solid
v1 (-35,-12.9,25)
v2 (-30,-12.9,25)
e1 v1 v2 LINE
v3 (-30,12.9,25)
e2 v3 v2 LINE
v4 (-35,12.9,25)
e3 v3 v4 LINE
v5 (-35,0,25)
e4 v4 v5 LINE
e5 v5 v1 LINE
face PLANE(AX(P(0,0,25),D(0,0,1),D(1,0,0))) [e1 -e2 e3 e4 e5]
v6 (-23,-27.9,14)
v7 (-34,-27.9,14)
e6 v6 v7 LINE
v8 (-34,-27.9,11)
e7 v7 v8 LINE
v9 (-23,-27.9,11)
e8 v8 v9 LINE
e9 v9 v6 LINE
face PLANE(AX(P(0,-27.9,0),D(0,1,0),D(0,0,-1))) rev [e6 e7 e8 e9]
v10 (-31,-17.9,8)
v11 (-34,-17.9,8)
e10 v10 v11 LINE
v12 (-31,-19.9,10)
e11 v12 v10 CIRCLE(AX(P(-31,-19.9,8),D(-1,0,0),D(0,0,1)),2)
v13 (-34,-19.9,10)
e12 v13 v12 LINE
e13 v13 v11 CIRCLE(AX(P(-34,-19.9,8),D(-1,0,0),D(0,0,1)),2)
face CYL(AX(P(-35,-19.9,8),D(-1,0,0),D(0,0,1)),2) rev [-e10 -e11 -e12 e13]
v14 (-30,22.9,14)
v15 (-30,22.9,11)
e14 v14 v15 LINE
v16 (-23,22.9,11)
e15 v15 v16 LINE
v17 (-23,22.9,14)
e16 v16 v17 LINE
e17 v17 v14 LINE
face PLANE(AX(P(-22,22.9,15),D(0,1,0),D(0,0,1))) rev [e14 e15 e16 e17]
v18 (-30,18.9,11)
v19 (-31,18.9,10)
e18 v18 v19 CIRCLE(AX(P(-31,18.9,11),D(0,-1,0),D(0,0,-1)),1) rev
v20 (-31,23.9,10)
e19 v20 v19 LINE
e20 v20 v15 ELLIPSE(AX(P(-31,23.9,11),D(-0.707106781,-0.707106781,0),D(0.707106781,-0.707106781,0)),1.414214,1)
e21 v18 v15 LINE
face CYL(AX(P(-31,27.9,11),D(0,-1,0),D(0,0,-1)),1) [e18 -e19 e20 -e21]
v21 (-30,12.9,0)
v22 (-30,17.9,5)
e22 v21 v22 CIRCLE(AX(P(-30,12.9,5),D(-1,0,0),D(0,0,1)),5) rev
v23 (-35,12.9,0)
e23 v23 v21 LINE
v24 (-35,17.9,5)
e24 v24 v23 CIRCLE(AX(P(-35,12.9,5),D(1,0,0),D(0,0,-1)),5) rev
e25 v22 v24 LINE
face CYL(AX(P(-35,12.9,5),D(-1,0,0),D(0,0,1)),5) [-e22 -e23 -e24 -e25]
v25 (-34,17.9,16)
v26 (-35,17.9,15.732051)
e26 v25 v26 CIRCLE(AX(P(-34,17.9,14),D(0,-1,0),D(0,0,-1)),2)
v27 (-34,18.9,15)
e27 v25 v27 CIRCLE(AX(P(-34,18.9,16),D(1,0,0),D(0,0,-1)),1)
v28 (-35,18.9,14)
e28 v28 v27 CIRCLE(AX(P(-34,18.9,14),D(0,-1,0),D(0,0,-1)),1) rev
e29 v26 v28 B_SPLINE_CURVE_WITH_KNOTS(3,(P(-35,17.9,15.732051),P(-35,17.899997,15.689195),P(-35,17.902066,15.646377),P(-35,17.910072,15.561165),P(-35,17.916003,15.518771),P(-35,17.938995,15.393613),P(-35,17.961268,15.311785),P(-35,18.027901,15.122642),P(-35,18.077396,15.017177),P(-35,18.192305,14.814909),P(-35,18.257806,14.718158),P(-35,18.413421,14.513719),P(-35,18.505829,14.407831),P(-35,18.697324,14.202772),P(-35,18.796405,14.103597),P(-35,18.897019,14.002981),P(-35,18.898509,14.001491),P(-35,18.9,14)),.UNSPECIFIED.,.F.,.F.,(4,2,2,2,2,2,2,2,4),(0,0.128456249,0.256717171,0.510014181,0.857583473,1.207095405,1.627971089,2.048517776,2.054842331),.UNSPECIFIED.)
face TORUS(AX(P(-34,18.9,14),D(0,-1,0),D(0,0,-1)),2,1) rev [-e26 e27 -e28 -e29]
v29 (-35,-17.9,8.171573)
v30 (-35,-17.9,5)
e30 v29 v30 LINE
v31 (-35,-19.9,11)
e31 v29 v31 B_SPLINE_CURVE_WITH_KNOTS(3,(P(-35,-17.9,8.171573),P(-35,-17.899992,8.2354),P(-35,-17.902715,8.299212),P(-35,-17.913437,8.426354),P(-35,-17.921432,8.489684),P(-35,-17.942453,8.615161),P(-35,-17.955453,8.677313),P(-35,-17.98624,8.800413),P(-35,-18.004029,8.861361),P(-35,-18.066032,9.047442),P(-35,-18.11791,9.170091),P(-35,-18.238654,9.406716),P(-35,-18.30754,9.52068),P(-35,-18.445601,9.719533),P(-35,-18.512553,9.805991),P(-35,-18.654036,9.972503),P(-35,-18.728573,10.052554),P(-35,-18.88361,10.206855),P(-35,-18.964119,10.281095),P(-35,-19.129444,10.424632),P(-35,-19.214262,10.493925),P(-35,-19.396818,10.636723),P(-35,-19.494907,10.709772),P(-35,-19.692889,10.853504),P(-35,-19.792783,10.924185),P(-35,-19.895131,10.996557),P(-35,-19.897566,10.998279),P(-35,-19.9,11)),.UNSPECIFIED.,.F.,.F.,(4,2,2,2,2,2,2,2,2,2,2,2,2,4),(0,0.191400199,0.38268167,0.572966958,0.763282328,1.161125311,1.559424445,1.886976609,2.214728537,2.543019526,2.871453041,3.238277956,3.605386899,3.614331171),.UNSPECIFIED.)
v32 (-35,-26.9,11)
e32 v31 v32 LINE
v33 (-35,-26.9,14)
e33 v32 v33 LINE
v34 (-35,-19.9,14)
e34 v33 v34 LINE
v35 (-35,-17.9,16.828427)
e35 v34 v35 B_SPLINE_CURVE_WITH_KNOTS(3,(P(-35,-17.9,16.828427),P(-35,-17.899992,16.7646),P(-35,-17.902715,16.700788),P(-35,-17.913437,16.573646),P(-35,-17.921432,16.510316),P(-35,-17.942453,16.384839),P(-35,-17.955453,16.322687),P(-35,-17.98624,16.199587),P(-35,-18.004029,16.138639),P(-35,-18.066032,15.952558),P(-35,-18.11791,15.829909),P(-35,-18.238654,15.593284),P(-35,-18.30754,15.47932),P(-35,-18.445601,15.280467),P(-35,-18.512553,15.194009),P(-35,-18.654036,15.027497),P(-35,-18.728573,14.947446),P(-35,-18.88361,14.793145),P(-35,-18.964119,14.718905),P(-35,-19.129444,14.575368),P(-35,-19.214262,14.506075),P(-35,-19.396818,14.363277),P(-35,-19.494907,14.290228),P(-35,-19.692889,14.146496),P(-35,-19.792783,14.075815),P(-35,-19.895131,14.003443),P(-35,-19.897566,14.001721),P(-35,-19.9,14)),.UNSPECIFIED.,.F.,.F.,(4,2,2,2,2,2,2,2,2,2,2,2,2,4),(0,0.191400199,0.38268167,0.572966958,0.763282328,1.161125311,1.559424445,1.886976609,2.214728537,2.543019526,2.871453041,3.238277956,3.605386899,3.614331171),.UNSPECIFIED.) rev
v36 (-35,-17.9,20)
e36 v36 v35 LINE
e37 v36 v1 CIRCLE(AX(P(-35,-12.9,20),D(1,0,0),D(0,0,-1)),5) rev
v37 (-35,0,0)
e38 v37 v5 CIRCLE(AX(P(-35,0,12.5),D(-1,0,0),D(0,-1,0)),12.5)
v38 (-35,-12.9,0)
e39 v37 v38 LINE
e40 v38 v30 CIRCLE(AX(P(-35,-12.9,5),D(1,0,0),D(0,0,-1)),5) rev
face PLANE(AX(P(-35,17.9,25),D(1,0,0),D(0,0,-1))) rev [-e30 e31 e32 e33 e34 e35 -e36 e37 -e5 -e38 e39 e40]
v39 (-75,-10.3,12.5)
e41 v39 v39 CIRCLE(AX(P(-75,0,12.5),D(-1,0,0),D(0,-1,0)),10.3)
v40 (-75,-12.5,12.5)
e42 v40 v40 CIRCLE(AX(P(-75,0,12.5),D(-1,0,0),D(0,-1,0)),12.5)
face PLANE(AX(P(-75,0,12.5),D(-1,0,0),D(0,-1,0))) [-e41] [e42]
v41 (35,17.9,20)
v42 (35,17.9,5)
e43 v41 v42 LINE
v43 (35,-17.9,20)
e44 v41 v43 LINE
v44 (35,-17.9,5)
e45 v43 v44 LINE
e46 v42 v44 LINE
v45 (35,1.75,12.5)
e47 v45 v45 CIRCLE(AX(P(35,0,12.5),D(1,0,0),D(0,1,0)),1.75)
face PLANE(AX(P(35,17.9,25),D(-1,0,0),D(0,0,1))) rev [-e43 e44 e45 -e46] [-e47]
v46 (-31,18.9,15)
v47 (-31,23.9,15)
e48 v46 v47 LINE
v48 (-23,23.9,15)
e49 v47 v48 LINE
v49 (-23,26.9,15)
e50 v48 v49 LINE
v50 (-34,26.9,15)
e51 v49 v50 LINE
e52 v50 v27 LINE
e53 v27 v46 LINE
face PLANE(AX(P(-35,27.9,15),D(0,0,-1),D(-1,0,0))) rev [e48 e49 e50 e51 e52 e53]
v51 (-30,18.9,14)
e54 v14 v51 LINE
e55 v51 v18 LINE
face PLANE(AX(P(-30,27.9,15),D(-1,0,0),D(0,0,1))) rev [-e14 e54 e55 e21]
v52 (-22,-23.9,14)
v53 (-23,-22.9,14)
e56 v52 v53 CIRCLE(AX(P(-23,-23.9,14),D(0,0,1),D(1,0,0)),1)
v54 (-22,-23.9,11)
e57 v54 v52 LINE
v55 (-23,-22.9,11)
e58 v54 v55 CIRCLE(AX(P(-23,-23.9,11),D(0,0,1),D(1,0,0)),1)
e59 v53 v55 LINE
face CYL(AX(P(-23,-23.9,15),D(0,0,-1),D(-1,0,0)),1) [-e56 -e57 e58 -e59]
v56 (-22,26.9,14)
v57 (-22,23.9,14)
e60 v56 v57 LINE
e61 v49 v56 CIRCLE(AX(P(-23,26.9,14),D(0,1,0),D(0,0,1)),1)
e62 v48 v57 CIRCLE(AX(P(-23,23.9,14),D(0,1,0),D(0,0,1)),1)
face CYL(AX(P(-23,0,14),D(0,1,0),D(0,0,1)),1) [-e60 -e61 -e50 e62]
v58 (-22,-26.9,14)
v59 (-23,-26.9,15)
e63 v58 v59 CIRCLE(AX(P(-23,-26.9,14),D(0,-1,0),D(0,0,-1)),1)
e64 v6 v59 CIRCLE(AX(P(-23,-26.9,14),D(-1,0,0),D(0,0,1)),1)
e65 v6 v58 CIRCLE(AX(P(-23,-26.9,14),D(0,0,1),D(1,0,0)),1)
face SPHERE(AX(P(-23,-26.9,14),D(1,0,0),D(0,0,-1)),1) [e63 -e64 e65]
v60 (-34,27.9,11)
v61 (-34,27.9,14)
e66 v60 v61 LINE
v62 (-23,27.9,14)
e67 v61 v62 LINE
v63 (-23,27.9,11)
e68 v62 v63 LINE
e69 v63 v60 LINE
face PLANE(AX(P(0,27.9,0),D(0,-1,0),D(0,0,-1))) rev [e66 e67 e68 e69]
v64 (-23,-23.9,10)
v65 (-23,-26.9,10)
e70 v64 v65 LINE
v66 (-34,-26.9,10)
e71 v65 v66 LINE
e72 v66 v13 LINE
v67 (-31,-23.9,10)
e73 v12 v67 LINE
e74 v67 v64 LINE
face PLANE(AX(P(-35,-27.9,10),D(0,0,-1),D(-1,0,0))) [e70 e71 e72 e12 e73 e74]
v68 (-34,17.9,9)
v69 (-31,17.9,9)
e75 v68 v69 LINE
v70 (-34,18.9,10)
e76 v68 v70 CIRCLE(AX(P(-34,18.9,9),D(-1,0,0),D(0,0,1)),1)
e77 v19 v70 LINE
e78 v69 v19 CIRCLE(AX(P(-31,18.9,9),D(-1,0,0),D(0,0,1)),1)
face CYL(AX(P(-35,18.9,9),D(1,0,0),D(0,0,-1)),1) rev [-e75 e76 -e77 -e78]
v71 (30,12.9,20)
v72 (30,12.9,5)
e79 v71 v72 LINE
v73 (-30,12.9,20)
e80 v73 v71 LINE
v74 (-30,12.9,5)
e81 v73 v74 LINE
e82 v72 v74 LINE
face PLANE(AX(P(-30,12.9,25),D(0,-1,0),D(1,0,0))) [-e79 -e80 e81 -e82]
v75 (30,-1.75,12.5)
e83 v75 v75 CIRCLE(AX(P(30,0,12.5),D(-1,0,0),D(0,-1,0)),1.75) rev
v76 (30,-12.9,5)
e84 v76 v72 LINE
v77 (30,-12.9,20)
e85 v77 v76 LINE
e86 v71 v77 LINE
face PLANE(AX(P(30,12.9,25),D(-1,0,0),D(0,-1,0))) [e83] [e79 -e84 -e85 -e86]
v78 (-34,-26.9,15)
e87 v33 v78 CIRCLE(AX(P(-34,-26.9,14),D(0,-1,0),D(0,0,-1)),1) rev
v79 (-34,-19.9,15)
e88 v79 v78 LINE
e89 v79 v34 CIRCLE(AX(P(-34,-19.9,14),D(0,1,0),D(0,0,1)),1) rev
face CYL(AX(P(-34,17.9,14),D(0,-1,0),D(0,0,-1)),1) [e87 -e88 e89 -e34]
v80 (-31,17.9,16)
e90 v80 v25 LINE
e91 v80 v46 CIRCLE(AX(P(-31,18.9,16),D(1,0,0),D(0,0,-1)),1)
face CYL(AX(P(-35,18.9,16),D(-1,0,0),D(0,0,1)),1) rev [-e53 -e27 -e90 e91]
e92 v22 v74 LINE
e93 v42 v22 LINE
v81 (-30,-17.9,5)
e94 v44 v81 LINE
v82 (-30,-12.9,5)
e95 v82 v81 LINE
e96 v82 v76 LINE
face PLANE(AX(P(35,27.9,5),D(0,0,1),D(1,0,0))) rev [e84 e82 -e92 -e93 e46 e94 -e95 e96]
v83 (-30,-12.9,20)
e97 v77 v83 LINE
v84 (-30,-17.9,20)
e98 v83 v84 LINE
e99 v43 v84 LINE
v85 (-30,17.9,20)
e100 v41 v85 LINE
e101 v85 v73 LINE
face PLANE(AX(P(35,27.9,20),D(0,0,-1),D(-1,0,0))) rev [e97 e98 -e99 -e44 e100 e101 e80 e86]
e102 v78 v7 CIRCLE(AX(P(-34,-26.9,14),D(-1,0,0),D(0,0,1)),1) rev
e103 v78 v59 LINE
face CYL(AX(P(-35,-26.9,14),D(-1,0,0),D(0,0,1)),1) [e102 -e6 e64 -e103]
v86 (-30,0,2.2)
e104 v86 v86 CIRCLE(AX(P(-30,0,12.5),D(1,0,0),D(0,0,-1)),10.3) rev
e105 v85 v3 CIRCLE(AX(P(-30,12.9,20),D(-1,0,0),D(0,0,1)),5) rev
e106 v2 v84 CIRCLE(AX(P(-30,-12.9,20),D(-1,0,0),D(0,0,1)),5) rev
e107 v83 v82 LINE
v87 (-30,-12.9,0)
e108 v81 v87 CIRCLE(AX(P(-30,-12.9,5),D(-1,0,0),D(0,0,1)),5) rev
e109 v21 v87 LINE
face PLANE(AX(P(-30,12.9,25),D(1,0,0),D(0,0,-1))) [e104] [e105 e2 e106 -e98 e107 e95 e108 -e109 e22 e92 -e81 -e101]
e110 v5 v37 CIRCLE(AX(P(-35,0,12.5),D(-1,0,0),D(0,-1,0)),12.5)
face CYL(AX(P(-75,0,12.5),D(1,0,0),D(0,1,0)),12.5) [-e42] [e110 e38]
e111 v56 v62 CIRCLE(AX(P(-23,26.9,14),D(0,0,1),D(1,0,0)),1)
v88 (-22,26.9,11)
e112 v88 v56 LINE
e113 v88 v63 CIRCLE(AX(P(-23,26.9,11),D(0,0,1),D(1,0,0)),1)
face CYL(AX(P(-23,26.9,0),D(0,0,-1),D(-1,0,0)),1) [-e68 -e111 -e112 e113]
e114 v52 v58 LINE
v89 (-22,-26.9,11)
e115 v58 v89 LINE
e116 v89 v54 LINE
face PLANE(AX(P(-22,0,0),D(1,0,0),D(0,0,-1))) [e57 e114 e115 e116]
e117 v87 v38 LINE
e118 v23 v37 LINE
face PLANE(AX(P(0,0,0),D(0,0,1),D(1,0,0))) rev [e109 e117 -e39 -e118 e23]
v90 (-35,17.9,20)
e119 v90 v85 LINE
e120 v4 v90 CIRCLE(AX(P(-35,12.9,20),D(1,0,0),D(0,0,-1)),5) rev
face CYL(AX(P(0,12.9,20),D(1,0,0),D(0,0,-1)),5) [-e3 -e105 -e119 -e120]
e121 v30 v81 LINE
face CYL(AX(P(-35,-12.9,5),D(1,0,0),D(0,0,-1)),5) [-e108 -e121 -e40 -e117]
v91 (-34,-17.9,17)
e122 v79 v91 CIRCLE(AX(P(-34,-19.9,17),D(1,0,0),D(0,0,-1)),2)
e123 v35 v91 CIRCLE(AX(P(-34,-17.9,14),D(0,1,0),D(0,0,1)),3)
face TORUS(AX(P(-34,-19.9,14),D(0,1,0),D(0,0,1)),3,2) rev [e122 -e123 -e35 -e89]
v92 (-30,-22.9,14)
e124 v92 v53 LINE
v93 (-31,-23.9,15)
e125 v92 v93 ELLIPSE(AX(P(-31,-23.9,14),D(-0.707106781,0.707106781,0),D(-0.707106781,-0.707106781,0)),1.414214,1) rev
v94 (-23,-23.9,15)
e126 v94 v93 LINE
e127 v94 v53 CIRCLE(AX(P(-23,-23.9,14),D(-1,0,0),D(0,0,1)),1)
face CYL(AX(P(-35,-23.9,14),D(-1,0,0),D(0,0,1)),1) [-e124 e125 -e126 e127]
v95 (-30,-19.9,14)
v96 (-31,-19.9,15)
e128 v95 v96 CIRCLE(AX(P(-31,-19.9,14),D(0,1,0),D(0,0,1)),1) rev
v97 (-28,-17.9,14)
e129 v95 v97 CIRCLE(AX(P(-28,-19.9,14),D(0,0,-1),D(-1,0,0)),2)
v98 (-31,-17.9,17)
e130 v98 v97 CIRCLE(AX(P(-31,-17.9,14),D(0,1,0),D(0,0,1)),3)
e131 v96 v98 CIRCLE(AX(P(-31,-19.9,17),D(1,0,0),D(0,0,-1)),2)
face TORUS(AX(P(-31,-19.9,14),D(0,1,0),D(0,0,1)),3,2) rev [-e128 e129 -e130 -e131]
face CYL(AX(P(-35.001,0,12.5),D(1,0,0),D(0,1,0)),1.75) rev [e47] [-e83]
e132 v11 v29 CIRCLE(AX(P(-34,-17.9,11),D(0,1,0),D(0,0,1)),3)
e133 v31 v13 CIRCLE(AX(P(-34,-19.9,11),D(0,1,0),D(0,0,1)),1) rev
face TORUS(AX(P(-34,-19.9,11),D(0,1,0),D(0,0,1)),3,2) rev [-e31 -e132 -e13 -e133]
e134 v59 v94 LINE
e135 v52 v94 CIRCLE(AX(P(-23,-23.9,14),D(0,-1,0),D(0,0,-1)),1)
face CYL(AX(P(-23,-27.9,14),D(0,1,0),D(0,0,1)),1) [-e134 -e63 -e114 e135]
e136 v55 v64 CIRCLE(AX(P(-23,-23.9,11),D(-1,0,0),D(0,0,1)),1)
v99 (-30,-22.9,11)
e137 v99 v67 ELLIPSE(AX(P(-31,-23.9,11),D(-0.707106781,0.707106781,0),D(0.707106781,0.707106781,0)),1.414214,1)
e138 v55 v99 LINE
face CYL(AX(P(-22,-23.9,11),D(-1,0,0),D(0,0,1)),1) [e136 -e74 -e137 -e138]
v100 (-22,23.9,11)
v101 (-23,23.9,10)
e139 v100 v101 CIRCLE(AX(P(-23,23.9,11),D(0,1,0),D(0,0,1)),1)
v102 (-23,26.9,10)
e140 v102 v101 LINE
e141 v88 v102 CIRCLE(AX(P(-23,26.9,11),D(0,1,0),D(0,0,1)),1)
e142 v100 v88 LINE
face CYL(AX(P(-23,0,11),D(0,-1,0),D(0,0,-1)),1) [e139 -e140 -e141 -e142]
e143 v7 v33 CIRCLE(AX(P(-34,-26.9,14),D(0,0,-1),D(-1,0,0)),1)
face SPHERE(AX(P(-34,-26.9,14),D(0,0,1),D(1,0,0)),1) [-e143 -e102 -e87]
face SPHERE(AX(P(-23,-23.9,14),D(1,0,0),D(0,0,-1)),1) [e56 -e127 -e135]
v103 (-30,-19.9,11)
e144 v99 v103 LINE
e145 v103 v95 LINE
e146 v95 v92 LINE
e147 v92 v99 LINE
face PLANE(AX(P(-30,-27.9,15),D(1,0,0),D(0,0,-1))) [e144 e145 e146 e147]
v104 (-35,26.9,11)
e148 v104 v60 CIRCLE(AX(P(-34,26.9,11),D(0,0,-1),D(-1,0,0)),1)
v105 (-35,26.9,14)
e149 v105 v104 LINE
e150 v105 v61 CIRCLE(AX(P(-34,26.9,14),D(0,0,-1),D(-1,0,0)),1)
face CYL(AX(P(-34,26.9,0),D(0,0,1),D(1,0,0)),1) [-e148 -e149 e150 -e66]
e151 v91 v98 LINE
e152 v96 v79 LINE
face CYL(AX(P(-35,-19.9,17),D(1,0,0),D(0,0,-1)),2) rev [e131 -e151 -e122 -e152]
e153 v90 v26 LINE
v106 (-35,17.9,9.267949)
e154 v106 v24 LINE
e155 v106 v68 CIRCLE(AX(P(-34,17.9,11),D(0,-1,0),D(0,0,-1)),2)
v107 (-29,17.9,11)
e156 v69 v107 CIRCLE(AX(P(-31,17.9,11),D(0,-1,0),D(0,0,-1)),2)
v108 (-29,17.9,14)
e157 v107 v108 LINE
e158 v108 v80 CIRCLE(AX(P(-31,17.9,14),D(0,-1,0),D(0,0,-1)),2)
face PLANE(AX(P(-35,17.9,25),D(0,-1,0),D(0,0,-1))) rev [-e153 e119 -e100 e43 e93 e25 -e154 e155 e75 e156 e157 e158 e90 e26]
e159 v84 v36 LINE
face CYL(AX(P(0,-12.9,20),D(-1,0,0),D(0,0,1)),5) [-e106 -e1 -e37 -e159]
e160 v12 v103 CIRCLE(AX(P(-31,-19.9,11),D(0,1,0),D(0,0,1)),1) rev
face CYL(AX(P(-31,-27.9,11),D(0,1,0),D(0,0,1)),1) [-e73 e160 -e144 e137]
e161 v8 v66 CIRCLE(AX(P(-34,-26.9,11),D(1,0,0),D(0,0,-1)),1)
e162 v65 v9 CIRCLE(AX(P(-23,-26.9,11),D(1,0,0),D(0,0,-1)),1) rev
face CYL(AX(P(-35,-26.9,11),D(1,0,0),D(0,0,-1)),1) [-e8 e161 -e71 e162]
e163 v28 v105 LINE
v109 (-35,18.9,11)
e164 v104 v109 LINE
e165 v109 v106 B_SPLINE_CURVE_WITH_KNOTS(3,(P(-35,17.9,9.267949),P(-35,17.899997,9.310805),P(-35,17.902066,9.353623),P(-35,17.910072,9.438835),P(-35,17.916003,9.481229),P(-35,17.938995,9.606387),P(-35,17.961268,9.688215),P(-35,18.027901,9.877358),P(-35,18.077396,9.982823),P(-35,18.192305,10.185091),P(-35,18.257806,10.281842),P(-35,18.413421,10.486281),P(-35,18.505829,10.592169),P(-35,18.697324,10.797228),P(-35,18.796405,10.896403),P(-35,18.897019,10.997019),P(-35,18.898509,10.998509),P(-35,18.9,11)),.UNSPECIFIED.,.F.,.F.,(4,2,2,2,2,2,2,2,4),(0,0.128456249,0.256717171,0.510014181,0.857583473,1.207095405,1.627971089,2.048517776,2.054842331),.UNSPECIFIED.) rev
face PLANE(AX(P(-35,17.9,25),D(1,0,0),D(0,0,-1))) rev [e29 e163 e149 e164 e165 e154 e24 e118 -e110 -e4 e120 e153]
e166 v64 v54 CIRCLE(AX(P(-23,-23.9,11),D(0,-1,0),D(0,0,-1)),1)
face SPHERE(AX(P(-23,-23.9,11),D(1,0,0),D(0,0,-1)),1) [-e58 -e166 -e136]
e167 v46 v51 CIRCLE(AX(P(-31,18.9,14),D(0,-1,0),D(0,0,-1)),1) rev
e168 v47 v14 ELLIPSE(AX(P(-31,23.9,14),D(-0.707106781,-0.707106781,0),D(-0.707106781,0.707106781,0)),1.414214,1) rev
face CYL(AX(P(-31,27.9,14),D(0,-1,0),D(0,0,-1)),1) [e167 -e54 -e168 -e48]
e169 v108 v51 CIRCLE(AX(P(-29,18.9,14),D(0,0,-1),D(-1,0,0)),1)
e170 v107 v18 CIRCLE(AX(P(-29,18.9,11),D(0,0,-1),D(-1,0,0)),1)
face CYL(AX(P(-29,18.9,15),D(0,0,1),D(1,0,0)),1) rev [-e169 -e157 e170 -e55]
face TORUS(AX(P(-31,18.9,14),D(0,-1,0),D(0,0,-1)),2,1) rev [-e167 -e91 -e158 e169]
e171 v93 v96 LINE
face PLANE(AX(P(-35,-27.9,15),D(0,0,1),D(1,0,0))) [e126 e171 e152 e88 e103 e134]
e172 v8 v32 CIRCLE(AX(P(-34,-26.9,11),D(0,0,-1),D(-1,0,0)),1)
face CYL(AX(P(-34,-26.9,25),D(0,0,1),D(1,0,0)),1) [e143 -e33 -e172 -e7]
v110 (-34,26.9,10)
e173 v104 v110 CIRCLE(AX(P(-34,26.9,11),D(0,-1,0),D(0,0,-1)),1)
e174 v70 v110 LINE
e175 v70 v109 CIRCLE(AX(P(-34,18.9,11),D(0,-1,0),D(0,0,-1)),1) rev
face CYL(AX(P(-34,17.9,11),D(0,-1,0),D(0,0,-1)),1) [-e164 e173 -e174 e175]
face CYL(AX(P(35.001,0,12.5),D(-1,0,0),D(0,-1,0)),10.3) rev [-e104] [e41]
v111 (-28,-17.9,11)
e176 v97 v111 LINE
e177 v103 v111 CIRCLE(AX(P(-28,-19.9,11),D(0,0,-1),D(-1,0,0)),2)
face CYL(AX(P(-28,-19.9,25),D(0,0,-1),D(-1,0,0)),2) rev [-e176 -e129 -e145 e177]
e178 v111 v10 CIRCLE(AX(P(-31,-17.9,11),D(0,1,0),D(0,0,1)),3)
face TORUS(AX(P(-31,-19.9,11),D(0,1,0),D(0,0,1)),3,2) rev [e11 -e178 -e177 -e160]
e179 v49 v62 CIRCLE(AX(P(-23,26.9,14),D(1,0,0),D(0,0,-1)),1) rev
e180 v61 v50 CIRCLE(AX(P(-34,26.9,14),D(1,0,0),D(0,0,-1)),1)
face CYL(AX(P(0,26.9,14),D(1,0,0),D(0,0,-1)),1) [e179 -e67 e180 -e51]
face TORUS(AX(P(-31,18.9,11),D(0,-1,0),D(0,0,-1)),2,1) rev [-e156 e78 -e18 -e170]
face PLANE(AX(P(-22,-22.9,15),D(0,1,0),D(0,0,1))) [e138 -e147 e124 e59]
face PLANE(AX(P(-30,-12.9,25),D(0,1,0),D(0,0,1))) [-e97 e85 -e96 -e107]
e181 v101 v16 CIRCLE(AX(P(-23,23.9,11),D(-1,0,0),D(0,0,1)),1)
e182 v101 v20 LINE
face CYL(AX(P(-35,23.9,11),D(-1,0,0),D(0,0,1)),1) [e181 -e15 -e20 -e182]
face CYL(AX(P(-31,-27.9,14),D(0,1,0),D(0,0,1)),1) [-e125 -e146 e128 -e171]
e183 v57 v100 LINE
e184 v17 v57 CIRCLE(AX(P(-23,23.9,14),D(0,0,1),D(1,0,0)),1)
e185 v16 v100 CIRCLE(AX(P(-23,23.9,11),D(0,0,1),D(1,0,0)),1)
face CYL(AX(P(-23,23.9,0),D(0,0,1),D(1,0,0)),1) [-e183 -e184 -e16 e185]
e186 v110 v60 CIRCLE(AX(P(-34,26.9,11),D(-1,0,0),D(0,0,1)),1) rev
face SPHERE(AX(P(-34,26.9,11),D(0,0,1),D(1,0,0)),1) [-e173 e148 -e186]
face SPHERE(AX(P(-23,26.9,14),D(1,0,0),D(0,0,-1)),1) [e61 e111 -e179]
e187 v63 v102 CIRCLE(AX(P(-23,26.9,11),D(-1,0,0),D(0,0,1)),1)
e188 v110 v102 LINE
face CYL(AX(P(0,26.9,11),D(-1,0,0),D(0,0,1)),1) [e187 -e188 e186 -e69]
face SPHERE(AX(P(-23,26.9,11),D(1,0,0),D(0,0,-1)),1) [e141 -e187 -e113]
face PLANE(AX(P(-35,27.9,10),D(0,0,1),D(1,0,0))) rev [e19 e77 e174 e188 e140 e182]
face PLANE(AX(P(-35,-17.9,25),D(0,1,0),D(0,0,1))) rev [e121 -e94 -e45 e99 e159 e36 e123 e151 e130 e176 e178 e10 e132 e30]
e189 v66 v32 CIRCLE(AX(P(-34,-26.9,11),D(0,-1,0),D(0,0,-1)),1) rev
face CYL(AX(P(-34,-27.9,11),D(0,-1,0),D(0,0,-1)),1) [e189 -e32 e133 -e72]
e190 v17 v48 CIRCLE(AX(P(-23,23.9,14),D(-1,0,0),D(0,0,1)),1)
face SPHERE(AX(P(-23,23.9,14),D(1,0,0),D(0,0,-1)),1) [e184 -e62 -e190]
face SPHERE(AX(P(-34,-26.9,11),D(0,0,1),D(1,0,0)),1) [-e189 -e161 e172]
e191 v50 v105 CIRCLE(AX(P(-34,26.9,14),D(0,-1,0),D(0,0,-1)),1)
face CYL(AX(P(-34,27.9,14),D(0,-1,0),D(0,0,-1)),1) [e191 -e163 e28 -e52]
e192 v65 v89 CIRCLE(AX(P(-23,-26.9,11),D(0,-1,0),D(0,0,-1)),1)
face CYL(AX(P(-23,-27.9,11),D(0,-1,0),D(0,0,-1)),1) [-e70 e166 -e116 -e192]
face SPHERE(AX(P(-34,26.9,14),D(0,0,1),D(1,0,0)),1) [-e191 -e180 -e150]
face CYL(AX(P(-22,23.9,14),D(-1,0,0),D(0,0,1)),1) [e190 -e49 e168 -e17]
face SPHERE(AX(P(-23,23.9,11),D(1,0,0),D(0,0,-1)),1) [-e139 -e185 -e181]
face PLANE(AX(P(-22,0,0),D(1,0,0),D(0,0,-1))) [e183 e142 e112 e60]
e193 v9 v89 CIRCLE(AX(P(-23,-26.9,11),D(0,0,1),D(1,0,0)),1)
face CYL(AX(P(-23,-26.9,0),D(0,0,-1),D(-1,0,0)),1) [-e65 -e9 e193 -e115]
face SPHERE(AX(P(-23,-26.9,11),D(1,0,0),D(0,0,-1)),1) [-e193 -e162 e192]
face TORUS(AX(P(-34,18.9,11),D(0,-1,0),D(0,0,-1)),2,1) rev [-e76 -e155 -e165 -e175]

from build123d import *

# Parameters (mm, degrees)
SKETCH1_W            = 70
SKETCH1_H            = 35.8
SKETCH1_W_2          = 60
SKETCH1_H_2          = 25.8
BOSS_EXTRUDE1_DEPTH  = 25
CUT_EXTRUDE4_REACH   = 78.455
SKETCH2_R            = 10.3
CUT_EXTRUDE5_REACH   = 78.455
SKETCH3_R            = 1.75
BOSS_EXTRUDE2_START  = 40
SKETCH4_R            = 12.5
SKETCH4_R_2          = 10.3
BOSS_EXTRUDE2_DEPTH  = 40
SKETCH8_W            = 5
SKETCH8_H            = 5
BOSS_EXTRUDE4_DEPTH  = 10
SKETCH11_W           = 5
SKETCH11_H           = 5
BOSS_EXTRUDE5_DEPTH  = 8
FILLET3_R            = 1
FILLET3_OF_MIRROR2_R = 1
FILLET5_START        = -35
FILLET5_DEPTH        = 71
FILLET6_R            = 1
FILLET7_R            = 1
FILLET8_R            = 1
FILLET9_R            = 1
FILLET10_R           = 2
SKETCH16_W           = 65
SKETCH16_H           = 5
CUT_EXTRUDE8_DEPTH   = 92.365420182


with BuildPart() as part:
    # Sketch1 → Boss-Extrude1 (new body)
    with BuildSketch(Plane.XY):
        Rectangle(SKETCH1_W, SKETCH1_H)
        Rectangle(SKETCH1_W_2, SKETCH1_H_2, mode=Mode.SUBTRACT)
    extrude(amount=BOSS_EXTRUDE1_DEPTH)

    # Sketch2 → Cut-Extrude4 (cut, up to next)
    with BuildSketch(Plane.ZY.offset(35), mode=Mode.PRIVATE) as cut_extrude4_sk1:
        with Locations(Location((12.5, 0, 0), (0, 0, 270))):
            Circle(SKETCH2_R)
    cut_extrude4_tool1 = extrude(cut_extrude4_sk1.sketch, amount=-CUT_EXTRUDE4_REACH, mode=Mode.PRIVATE) & part.part
    add(cut_extrude4_tool1.solids().sort_by_distance((-35, 0, 12.5))[0], mode=Mode.SUBTRACT)

    # Sketch3 → Cut-Extrude5 (cut, up to next)
    with BuildSketch(Plane(origin=(35, 0, 0), x_dir=(0, 0, -1), z_dir=(1, 0, 0)), mode=Mode.PRIVATE) as cut_extrude5_sk1:
        with Locations(Location((-12.5, 0, 0), (0, 0, 90))):
            Circle(SKETCH3_R)
    cut_extrude5_tool1 = extrude(cut_extrude5_sk1.sketch, amount=-CUT_EXTRUDE5_REACH, mode=Mode.PRIVATE) & part.part
    add(cut_extrude5_tool1.solids().sort_by_distance((35, 0, 12.5))[0], mode=Mode.SUBTRACT)

    # Sketch4 → Boss-Extrude2 (add)
    with BuildSketch(Plane.ZY.offset(35).offset(BOSS_EXTRUDE2_START)):
        with Locations(Location((12.5, 0, 0), (0, 0, 180))):
            Circle(SKETCH4_R)
        with Locations(Location((12.5, 0, 0), (0, 0, 270))):
            Circle(SKETCH4_R_2, mode=Mode.SUBTRACT)
    extrude(amount=-BOSS_EXTRUDE2_DEPTH)

    # Sketch8 → Boss-Extrude4 (add)
    with BuildSketch(Plane(origin=(0, 17.9, 0), x_dir=(1, 0, 0), z_dir=(0, 1, 0))):
        with Locations((-32.5, -12.5)):
            Rectangle(SKETCH8_W, SKETCH8_H)
    boss_extrude4 = extrude(amount=BOSS_EXTRUDE4_DEPTH)

    # Sketch11 → Boss-Extrude5 (add)
    with BuildSketch(Plane(origin=(-30, 0, 0), x_dir=(0, 0, -1), z_dir=(1, 0, 0))):
        with Locations((-12.5, 25.4)):
            Rectangle(SKETCH11_W, SKETCH11_H)
    boss_extrude5 = extrude(amount=BOSS_EXTRUDE5_DEPTH)

    # Fillet3
    fillet3_edges = [part.edges().sort_by_distance(p)[0] for p in [
        (-35, 22.9, 10),
        (-35, 22.9, 15),
        (-28.5, 27.9, 15),
        (-28.5, 27.9, 10),
        (-30, 20.4, 10),
        (-30, 20.4, 15),
        (-26, 22.9, 15),
        (-26, 22.9, 10),
    ]]
    fillet(fillet3_edges, radius=FILLET3_R)

    # Mirror2: Boss-Extrude4, Boss-Extrude5 across plane
    add(boss_extrude4.mirror(Plane.ZX))
    add(boss_extrude5.mirror(Plane.ZX))

    # Fillet3 of Mirror2
    fillet3_of_mirror2_edges = [part.edges().sort_by_distance(p)[0] for p in [
        (-35, -22.9, 10),
        (-35, -22.9, 15),
        (-28.5, -27.9, 15),
        (-28.5, -27.9, 10),
        (-30, -20.4, 10),
        (-30, -20.4, 15),
        (-26, -22.9, 15),
        (-26, -22.9, 10),
    ]]
    fillet(fillet3_of_mirror2_edges, radius=FILLET3_OF_MIRROR2_R)

    # Fillet5: read off the stored shape, not the designer's step
    # Fillet5 outline → Fillet5 (cut)
    with BuildSketch(Plane.YZ.offset(FILLET5_START)):
        with BuildLine():
            ThreePointArc((12.9, 25), (16.435533906, 23.535533906), (17.9, 20))
            Line((17.9, 20), (17.9, 25))
            Line((17.9, 25), (12.9, 25))
        make_face()
        with BuildLine():
            Line((17.9, 0), (17.9, 5))
            ThreePointArc((17.9, 5), (16.435533906, 1.464466094), (12.9, 0))
            Line((12.9, 0), (17.9, 0))
        make_face()
        with BuildLine():
            ThreePointArc((-17.9, 20), (-16.435533906, 23.535533906), (-12.9, 25))
            Line((-12.9, 25), (-17.9, 25))
            Line((-17.9, 25), (-17.9, 20))
        make_face()
        with BuildLine():
            Line((-17.9, 0), (-12.9, 0))
            ThreePointArc((-12.9, 0), (-16.435533906, 1.464466094), (-17.9, 5))
            Line((-17.9, 5), (-17.9, 0))
        make_face()
    extrude(amount=FILLET5_DEPTH, mode=Mode.SUBTRACT)

    # Fillet6
    fillet6_edges = [part.edges().sort_by_distance(p)[0] for p in [
        (-22, -25.4, 10),
        (-22, -22.9, 12.5),
        (-22, -25.4, 15),
        (-22, -27.9, 12.5),
        (-22, -23.192893219, 14.707106781),
        (-22, -27.607106781, 14.707106781),
        (-22, -27.607106781, 10.292893219),
        (-22, -23.192893219, 10.292893219),
    ]]
    fillet(fillet6_edges, radius=FILLET6_R)

    # Fillet7
    fillet7_edges = [part.edges().sort_by_distance(p)[0] for p in [
        (-22, 25.4, 10),
        (-22, 22.9, 12.5),
        (-22, 25.4, 15),
        (-22, 27.9, 12.5),
        (-22, 23.192893219, 14.707106781),
        (-22, 27.607106781, 14.707106781),
        (-22, 27.607106781, 10.292893219),
        (-22, 23.192893219, 10.292893219),
    ]]
    fillet(fillet7_edges, radius=FILLET7_R)

    # Fillet8
    # the kernel refuses this fillet: 1 mm, written as the material it takes off along each edge
    with BuildSketch(Plane(origin=(-34, 26.9, 11), x_dir=(-1, 0, 0), z_dir=(0, 1, 0))) as fillet8_piece_1_section:
        Polygon((0, 0), (FILLET8_R, 0), (FILLET8_R, -FILLET8_R), (0, -FILLET8_R), align=None)
    fillet8_piece_1 = extrude(amount=FILLET8_R, mode=Mode.PRIVATE)
    fillet8_piece_1 = fillet8_piece_1 - Plane(origin=(-34, 26.9, 11), x_dir=(0.7071067811865475, 0, 0.7071067811865475), z_dir=(0, 1, 0)) * Sphere(FILLET8_R, mode=Mode.PRIVATE)
    add(fillet8_piece_1, mode=Mode.SUBTRACT)
    with BuildSketch(Plane(origin=(-34, 26.9, 14), x_dir=(-1, 0, 0), z_dir=(0, 1, 0))) as fillet8_piece_2_section:
        Polygon((0, 0), (FILLET8_R, 0), (FILLET8_R, FILLET8_R), (0, FILLET8_R), align=None)
    fillet8_piece_2 = extrude(amount=FILLET8_R, mode=Mode.PRIVATE)
    fillet8_piece_2 = fillet8_piece_2 - Plane(origin=(-34, 26.9, 14), x_dir=(0.7071067811865475, 0, -0.7071067811865475), z_dir=(0, 1, 0)) * Sphere(FILLET8_R, mode=Mode.PRIVATE)
    add(fillet8_piece_2, mode=Mode.SUBTRACT)
    with BuildSketch(Plane(origin=(-34, -26.9, 11), x_dir=(0, -1, 0), z_dir=(-1, 0, 0))) as fillet8_piece_3_section:
        Polygon((0, 0), (FILLET8_R, 0), (FILLET8_R, -FILLET8_R), (0, -FILLET8_R), align=None)
    fillet8_piece_3 = extrude(amount=FILLET8_R, mode=Mode.PRIVATE)
    fillet8_piece_3 = fillet8_piece_3 - Plane(origin=(-34, -26.9, 11), x_dir=(0, 0.7071067811865475, 0.7071067811865475), z_dir=(-1, 0, 0)) * Sphere(FILLET8_R, mode=Mode.PRIVATE)
    add(fillet8_piece_3, mode=Mode.SUBTRACT)
    with BuildSketch(Plane(origin=(-34, -26.9, 14), x_dir=(0, -1, 0), z_dir=(-1, 0, 0))) as fillet8_piece_4_section:
        Polygon((0, 0), (FILLET8_R, 0), (FILLET8_R, FILLET8_R), (0, FILLET8_R), align=None)
    fillet8_piece_4 = extrude(amount=FILLET8_R, mode=Mode.PRIVATE)
    fillet8_piece_4 = fillet8_piece_4 - Plane(origin=(-34, -26.9, 14), x_dir=(0, 0.7071067811865475, -0.7071067811865475), z_dir=(-1, 0, 0)) * Sphere(FILLET8_R, mode=Mode.PRIVATE)
    add(fillet8_piece_4, mode=Mode.SUBTRACT)
    with BuildSketch(Plane(origin=(-35, -27.9, 11), x_dir=(0, 1, 0), z_dir=(0, 0, 1)), Plane(origin=(-35, 27.9, 11), x_dir=(1, 0, 0), z_dir=(0, 0, 1))) as fillet8_piece_5:
        with BuildLine():
            CenterArc((FILLET8_R, -FILLET8_R), FILLET8_R, 90, 90)
            Line((0, -FILLET8_R), (0, 0))
            Line((0, 0), (FILLET8_R, 0))
        make_face()
    extrude(amount=3, mode=Mode.SUBTRACT)

    # Fillet9
    # the kernel refuses this fillet: 1 mm, written as the material it adds along each edge
    with BuildSketch(Plane(origin=(-31, 17.9, 10), x_dir=(0, 1, 0), z_dir=(-1, 0, 0)), Plane(origin=(-34, 17.9, 15), x_dir=(0, 1, 0), z_dir=(1, 0, 0))) as fillet9_piece_1:
        with BuildLine():
            CenterArc((FILLET9_R, FILLET9_R), FILLET9_R, 180, 90)
            Line((0, FILLET9_R), (0, 0))
            Line((0, 0), (FILLET9_R, 0))
        make_face()
    extrude(amount=3)
    with BuildSketch(Plane(origin=(-30, 17.9, 14), x_dir=(1, 0, 0), z_dir=(0, 0, -1))) as fillet9_piece_2:
        with BuildLine():
            CenterArc((FILLET9_R, -FILLET9_R), FILLET9_R, 90, 90)
            Line((0, -FILLET9_R), (0, 0))
            Line((0, 0), (FILLET9_R, 0))
        make_face()
    extrude(amount=3)
    with BuildSketch(Plane(origin=(-34, 17.9, 11), x_dir=(0, 0, -1), z_dir=(1, 0, 0))) as fillet9_piece_3_section:
        with BuildLine():
            CenterArc((1 + FILLET9_R, FILLET9_R), FILLET9_R, 180, 90)
            Line((1, FILLET9_R), (1, 0))
            Line((1, 0), (1 + FILLET9_R, 0))
        make_face()
    fillet9_piece_3 = revolve(axis=Axis((-34, 17.9, 11), (0, 1, 0)), revolution_arc=233.296989237, mode=Mode.PRIVATE)
    fillet9_piece_3 = split(fillet9_piece_3, bisect_by=Plane(origin=(-35, 17.9, 11), z_dir=(1, 0, 0)), keep=Keep.TOP, mode=Mode.PRIVATE)
    add(fillet9_piece_3)
    with BuildSketch(Plane(origin=(-31, 17.9, 11), x_dir=(0, 0, -1), z_dir=(-1, 0, 0))) as fillet9_piece_4:
        with BuildLine():
            CenterArc((1 + FILLET9_R, -FILLET9_R), FILLET9_R, 90, 90)
            Line((1, -FILLET9_R), (1, 0))
            Line((1, 0), (1 + FILLET9_R, 0))
        make_face()
    revolve(axis=Axis((-31, 17.9, 11), (0, -1, 0)), revolution_arc=90)
    with BuildSketch(Plane(origin=(-34, 17.9, 14), x_dir=(0, 0, 1), z_dir=(1, 0, 0))) as fillet9_piece_5_section:
        with BuildLine():
            CenterArc((1 + FILLET9_R, -FILLET9_R), FILLET9_R, 90, 90)
            Line((1 + FILLET9_R, 0), (1, 0))
            Line((1, 0), (1, -FILLET9_R))
        make_face()
    fillet9_piece_5 = revolve(axis=Axis((-34, 17.9, 14), (0, -1, 0)), revolution_arc=233.296989237, mode=Mode.PRIVATE)
    fillet9_piece_5 = split(fillet9_piece_5, bisect_by=Plane(origin=(-35, 17.9, 14), z_dir=(1, 0, 0)), keep=Keep.TOP, mode=Mode.PRIVATE)
    add(fillet9_piece_5)
    with BuildSketch(Plane(origin=(-31, 17.9, 14), x_dir=(1, 0, 0), z_dir=(0, 0, -1))) as fillet9_piece_6:
        with BuildLine():
            CenterArc((1 + FILLET9_R, -FILLET9_R), FILLET9_R, 90, 90)
            Line((1 + FILLET9_R, 0), (1, 0))
            Line((1, 0), (1, -FILLET9_R))
        make_face()
    revolve(axis=Axis((-31, 17.9, 14), (0, -1, 0)), revolution_arc=90)

    # Fillet10
    fillet10_edges = [part.edges().sort_by_distance(p)[0] for p in [
        (-32.5, -17.9, 10),
        (-30, -17.9, 12.5),
        (-32.5, -17.9, 15),
        (-34.707106781, -17.9, 10.292893219),
        (-30.292893219, -17.9, 10.292893219),
        (-34.707106781, -17.9, 14.707106781),
        (-30.292893219, -17.9, 14.707106781),
    ]]
    fillet(fillet10_edges, radius=FILLET10_R)

    # Sketch16 → Cut-Extrude8 (cut, through all)
    with BuildSketch(Plane.XZ.offset(17.9)):
        with Locations((2.5, 22.5)):
            Rectangle(SKETCH16_W, SKETCH16_H)
        with Locations((2.5, 2.5)):
            Rectangle(SKETCH16_W, SKETCH16_H)
    extrude(amount=-CUT_EXTRUDE8_DEPTH, mode=Mode.SUBTRACT)


solid = part.part
